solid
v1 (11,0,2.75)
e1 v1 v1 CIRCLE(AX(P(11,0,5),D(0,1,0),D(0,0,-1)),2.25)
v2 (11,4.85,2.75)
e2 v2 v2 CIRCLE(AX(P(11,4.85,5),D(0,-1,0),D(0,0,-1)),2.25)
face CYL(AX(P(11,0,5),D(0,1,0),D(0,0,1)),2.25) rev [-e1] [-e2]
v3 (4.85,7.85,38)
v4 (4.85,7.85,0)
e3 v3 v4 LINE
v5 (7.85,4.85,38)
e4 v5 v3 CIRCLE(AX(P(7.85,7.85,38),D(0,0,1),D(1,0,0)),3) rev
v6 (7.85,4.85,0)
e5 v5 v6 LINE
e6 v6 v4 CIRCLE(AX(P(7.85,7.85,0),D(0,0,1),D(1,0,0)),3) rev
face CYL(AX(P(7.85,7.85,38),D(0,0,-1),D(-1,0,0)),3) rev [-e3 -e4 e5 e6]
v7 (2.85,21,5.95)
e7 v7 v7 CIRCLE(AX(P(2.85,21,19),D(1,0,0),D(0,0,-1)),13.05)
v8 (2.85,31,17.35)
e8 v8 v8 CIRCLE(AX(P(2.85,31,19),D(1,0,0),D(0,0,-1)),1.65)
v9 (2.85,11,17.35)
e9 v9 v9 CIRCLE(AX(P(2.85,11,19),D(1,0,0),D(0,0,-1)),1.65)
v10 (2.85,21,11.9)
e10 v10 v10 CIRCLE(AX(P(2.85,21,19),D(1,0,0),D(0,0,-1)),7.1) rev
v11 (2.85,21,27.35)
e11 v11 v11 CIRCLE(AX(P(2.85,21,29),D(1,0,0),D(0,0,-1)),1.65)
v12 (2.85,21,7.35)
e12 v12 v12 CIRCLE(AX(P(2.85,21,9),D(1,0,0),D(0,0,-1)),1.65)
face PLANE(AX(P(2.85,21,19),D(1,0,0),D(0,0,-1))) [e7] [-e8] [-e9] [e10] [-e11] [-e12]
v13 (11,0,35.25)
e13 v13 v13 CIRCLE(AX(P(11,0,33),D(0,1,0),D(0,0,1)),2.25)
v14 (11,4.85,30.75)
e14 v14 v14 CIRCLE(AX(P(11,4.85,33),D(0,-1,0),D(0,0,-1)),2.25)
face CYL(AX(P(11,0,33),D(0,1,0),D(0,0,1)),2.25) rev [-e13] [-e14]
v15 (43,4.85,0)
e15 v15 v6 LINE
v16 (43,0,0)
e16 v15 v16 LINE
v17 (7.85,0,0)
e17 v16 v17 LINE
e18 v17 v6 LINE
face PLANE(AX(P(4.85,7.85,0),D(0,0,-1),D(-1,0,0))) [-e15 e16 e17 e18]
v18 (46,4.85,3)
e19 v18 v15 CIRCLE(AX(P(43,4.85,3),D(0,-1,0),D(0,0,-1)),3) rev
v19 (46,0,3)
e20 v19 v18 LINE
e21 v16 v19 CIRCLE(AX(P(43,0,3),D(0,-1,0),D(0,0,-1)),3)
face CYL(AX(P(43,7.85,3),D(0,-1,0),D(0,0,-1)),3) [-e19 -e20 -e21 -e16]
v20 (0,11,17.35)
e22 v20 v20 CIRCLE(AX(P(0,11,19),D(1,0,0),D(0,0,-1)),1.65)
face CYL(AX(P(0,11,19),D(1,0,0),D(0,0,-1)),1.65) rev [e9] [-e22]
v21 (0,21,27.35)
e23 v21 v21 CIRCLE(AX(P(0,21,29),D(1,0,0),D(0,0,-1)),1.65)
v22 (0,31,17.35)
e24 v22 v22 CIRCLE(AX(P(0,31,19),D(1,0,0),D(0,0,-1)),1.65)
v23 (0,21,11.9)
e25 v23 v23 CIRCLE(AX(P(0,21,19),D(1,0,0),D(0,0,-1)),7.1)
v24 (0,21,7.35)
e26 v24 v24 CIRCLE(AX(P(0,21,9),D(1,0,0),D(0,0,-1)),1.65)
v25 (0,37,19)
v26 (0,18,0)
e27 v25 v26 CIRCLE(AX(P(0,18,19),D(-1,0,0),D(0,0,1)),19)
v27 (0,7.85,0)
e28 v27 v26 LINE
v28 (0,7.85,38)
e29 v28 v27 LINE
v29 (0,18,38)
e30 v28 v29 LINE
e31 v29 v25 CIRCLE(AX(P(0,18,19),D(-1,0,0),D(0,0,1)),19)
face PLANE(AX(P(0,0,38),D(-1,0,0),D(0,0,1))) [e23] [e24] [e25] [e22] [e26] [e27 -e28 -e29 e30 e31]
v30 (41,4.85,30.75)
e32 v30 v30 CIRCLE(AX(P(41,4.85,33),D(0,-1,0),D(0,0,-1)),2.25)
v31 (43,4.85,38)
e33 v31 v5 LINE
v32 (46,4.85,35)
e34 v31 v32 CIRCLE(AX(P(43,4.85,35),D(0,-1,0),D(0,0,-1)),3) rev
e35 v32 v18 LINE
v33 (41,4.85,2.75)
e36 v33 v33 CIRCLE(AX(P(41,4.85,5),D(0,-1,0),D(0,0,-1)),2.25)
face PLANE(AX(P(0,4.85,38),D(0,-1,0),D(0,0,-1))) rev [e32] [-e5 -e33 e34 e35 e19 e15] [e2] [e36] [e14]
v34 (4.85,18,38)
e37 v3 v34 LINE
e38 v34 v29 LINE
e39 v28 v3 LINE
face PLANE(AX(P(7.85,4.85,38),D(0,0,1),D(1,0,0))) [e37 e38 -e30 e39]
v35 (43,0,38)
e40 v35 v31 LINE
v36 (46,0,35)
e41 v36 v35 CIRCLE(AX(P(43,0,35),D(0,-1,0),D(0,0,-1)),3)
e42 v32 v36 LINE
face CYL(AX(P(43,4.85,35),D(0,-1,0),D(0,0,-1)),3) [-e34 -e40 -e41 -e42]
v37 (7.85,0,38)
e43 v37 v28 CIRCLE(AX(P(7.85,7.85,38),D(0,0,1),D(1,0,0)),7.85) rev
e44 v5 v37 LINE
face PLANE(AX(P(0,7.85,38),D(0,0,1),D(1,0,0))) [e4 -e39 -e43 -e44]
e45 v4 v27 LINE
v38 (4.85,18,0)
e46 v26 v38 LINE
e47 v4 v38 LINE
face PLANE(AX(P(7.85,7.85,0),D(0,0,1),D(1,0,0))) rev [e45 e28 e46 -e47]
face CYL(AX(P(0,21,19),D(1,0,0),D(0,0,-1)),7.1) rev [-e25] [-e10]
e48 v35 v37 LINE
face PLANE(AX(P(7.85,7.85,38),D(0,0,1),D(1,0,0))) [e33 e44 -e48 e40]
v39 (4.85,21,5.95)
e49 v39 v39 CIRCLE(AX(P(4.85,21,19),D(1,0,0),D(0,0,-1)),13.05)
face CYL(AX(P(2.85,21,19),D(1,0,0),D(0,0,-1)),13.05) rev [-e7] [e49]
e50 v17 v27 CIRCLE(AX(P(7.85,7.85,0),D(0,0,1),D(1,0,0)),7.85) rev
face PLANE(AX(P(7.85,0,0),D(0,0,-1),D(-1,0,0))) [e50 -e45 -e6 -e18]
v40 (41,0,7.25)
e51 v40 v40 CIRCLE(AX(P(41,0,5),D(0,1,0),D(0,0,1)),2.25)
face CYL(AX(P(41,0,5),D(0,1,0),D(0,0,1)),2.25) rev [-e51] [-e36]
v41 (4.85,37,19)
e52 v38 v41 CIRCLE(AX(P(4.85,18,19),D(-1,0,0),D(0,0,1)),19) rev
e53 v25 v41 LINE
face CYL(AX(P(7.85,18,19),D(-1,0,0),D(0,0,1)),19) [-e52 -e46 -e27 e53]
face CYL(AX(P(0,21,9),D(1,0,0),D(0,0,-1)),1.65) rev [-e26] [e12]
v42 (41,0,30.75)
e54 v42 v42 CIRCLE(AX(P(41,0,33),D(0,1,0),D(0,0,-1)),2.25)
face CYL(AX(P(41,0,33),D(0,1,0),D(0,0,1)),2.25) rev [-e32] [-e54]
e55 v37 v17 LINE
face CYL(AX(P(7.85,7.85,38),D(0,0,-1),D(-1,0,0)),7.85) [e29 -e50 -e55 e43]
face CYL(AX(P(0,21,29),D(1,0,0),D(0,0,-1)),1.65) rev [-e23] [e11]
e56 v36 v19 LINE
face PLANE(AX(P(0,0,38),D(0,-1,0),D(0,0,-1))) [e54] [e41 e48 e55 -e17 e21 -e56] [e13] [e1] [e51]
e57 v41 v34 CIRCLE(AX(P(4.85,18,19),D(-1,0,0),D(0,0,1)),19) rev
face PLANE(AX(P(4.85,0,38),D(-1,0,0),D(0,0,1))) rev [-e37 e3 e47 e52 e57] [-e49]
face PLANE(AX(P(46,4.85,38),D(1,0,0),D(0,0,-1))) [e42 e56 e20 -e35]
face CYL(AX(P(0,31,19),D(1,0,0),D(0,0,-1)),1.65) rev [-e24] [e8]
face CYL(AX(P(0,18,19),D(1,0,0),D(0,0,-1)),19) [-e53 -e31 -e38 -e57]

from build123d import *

# Parameters (mm, degrees)
T_LE_DE_BASE_PLI_E1_DEPTH    = 38
ENL_V_MAT_EXTRU_1_DEPTH      = 68.129147917
ENL_V_MAT_EXTRU_1_DEPTH_BACK = 68.129147917
ESQUISSE6_R                  = 7.1
ESQUISSE7_R                  = 13.05
ENL_V_MAT_EXTRU_2_DEPTH      = 2
CONG_1_R                     = 19
ENL_V_MAT_EXTRU_3_DEPTH      = 69.373404917
ENL_V_MAT_EXTRU_3_DEPTH_BACK = 69.373404917
ESQUISSE8_R                  = 1.65
ENL_V_MAT_EXTRU_4_DEPTH      = 68.77626797
ENL_V_MAT_EXTRU_4_DEPTH_BACK = 68.77626797
ESQUISSE9_R                  = 2.25
CONG_2_R                     = 3


# Read off the part's stored shape, not the designer's step: Tôle de base pliée1
with BuildPart() as part:
    # Tôle de base pliée1 outline → Tôle de base pliée1 (new body)
    with BuildSketch(Plane.XY):
        with BuildLine():
            Line((4.85, 7.85), (4.85, 37))
            Line((4.85, 37), (0, 37))
            Line((0, 37), (0, 7.85))
            ThreePointArc((0, 7.85), (2.299211768, 2.299211768), (7.85, 0))
            Line((7.85, 0), (46, 0))
            Line((46, 0), (46, 4.85))
            Line((46, 4.85), (7.85, 4.85))
            ThreePointArc((7.85, 4.85), (5.728679656, 5.728679656), (4.85, 7.85))
        make_face()
    extrude(amount=T_LE_DE_BASE_PLI_E1_DEPTH)

    # Esquisse6 → Enlèv. mat.-Extru.1 (cut, two sides: drawn at the far end of the back side and taken through both)
    with BuildSketch(Plane(origin=(4.85, 0, 0), x_dir=(0, 0, -1), z_dir=(1, 0, 0)).offset(-ENL_V_MAT_EXTRU_1_DEPTH_BACK)):
        with Locations((-19, 21)):
            Circle(ESQUISSE6_R)
    extrude(amount=ENL_V_MAT_EXTRU_1_DEPTH + ENL_V_MAT_EXTRU_1_DEPTH_BACK, mode=Mode.SUBTRACT)

    # Esquisse7 → Enlèv. mat.-Extru.2 (cut)
    with BuildSketch(Plane(origin=(4.85, 0, 0), x_dir=(0, 0, -1), z_dir=(1, 0, 0))):
        with Locations((-19, 21)):
            Circle(ESQUISSE7_R)
    extrude(amount=-ENL_V_MAT_EXTRU_2_DEPTH, mode=Mode.SUBTRACT)

    # Congé1
    cong_1_edges = [part.edges().sort_by_distance(p)[0] for p in [
        (2.425, 37, 0),
        (2.425, 37, 38),
    ]]
    fillet(cong_1_edges, radius=CONG_1_R - 0.0001)  # a hair under: the kernel refuses the full size

    # Esquisse8 → Enlèv. mat.-Extru.3 (cut, two sides: drawn at the far end of the back side and taken through both)
    with BuildSketch(Plane(origin=(2.85, 0, 0), x_dir=(0, 0, -1), z_dir=(1, 0, 0)).offset(-ENL_V_MAT_EXTRU_3_DEPTH_BACK)):
        with Locations((-9, 21)):
            Circle(ESQUISSE8_R)
        with Locations((-19, 11)):
            Circle(ESQUISSE8_R)
        with Locations((-29, 21)):
            Circle(ESQUISSE8_R)
        with Locations((-19, 31)):
            Circle(ESQUISSE8_R)
    extrude(amount=ENL_V_MAT_EXTRU_3_DEPTH + ENL_V_MAT_EXTRU_3_DEPTH_BACK, mode=Mode.SUBTRACT)

    # Esquisse9 → Enlèv. mat.-Extru.4 (cut, two sides: drawn at the far end of the back side and taken through both)
    with BuildSketch(Plane(origin=(0, 4.85, 0), x_dir=(1, 0, 0), z_dir=(0, 1, 0)).offset(-ENL_V_MAT_EXTRU_4_DEPTH_BACK)):
        with Locations(Location((41, -5, 0), (0, 0, 270))):
            Circle(ESQUISSE9_R)
        with Locations(Location((11, -5, 0), (0, 0, 90))):
            Circle(ESQUISSE9_R)
        with Locations(Location((11, -33, 0), (0, 0, 270))):
            Circle(ESQUISSE9_R)
        with Locations(Location((41, -33, 0), (0, 0, 90))):
            Circle(ESQUISSE9_R)
    extrude(amount=ENL_V_MAT_EXTRU_4_DEPTH + ENL_V_MAT_EXTRU_4_DEPTH_BACK, mode=Mode.SUBTRACT)

    # Congé2
    cong_2_edges = [part.edges().sort_by_distance(p)[0] for p in [
        (46, 2.425, 38),
        (46, 2.425, 0),
    ]]
    fillet(cong_2_edges, radius=CONG_2_R)


solid = part.part
